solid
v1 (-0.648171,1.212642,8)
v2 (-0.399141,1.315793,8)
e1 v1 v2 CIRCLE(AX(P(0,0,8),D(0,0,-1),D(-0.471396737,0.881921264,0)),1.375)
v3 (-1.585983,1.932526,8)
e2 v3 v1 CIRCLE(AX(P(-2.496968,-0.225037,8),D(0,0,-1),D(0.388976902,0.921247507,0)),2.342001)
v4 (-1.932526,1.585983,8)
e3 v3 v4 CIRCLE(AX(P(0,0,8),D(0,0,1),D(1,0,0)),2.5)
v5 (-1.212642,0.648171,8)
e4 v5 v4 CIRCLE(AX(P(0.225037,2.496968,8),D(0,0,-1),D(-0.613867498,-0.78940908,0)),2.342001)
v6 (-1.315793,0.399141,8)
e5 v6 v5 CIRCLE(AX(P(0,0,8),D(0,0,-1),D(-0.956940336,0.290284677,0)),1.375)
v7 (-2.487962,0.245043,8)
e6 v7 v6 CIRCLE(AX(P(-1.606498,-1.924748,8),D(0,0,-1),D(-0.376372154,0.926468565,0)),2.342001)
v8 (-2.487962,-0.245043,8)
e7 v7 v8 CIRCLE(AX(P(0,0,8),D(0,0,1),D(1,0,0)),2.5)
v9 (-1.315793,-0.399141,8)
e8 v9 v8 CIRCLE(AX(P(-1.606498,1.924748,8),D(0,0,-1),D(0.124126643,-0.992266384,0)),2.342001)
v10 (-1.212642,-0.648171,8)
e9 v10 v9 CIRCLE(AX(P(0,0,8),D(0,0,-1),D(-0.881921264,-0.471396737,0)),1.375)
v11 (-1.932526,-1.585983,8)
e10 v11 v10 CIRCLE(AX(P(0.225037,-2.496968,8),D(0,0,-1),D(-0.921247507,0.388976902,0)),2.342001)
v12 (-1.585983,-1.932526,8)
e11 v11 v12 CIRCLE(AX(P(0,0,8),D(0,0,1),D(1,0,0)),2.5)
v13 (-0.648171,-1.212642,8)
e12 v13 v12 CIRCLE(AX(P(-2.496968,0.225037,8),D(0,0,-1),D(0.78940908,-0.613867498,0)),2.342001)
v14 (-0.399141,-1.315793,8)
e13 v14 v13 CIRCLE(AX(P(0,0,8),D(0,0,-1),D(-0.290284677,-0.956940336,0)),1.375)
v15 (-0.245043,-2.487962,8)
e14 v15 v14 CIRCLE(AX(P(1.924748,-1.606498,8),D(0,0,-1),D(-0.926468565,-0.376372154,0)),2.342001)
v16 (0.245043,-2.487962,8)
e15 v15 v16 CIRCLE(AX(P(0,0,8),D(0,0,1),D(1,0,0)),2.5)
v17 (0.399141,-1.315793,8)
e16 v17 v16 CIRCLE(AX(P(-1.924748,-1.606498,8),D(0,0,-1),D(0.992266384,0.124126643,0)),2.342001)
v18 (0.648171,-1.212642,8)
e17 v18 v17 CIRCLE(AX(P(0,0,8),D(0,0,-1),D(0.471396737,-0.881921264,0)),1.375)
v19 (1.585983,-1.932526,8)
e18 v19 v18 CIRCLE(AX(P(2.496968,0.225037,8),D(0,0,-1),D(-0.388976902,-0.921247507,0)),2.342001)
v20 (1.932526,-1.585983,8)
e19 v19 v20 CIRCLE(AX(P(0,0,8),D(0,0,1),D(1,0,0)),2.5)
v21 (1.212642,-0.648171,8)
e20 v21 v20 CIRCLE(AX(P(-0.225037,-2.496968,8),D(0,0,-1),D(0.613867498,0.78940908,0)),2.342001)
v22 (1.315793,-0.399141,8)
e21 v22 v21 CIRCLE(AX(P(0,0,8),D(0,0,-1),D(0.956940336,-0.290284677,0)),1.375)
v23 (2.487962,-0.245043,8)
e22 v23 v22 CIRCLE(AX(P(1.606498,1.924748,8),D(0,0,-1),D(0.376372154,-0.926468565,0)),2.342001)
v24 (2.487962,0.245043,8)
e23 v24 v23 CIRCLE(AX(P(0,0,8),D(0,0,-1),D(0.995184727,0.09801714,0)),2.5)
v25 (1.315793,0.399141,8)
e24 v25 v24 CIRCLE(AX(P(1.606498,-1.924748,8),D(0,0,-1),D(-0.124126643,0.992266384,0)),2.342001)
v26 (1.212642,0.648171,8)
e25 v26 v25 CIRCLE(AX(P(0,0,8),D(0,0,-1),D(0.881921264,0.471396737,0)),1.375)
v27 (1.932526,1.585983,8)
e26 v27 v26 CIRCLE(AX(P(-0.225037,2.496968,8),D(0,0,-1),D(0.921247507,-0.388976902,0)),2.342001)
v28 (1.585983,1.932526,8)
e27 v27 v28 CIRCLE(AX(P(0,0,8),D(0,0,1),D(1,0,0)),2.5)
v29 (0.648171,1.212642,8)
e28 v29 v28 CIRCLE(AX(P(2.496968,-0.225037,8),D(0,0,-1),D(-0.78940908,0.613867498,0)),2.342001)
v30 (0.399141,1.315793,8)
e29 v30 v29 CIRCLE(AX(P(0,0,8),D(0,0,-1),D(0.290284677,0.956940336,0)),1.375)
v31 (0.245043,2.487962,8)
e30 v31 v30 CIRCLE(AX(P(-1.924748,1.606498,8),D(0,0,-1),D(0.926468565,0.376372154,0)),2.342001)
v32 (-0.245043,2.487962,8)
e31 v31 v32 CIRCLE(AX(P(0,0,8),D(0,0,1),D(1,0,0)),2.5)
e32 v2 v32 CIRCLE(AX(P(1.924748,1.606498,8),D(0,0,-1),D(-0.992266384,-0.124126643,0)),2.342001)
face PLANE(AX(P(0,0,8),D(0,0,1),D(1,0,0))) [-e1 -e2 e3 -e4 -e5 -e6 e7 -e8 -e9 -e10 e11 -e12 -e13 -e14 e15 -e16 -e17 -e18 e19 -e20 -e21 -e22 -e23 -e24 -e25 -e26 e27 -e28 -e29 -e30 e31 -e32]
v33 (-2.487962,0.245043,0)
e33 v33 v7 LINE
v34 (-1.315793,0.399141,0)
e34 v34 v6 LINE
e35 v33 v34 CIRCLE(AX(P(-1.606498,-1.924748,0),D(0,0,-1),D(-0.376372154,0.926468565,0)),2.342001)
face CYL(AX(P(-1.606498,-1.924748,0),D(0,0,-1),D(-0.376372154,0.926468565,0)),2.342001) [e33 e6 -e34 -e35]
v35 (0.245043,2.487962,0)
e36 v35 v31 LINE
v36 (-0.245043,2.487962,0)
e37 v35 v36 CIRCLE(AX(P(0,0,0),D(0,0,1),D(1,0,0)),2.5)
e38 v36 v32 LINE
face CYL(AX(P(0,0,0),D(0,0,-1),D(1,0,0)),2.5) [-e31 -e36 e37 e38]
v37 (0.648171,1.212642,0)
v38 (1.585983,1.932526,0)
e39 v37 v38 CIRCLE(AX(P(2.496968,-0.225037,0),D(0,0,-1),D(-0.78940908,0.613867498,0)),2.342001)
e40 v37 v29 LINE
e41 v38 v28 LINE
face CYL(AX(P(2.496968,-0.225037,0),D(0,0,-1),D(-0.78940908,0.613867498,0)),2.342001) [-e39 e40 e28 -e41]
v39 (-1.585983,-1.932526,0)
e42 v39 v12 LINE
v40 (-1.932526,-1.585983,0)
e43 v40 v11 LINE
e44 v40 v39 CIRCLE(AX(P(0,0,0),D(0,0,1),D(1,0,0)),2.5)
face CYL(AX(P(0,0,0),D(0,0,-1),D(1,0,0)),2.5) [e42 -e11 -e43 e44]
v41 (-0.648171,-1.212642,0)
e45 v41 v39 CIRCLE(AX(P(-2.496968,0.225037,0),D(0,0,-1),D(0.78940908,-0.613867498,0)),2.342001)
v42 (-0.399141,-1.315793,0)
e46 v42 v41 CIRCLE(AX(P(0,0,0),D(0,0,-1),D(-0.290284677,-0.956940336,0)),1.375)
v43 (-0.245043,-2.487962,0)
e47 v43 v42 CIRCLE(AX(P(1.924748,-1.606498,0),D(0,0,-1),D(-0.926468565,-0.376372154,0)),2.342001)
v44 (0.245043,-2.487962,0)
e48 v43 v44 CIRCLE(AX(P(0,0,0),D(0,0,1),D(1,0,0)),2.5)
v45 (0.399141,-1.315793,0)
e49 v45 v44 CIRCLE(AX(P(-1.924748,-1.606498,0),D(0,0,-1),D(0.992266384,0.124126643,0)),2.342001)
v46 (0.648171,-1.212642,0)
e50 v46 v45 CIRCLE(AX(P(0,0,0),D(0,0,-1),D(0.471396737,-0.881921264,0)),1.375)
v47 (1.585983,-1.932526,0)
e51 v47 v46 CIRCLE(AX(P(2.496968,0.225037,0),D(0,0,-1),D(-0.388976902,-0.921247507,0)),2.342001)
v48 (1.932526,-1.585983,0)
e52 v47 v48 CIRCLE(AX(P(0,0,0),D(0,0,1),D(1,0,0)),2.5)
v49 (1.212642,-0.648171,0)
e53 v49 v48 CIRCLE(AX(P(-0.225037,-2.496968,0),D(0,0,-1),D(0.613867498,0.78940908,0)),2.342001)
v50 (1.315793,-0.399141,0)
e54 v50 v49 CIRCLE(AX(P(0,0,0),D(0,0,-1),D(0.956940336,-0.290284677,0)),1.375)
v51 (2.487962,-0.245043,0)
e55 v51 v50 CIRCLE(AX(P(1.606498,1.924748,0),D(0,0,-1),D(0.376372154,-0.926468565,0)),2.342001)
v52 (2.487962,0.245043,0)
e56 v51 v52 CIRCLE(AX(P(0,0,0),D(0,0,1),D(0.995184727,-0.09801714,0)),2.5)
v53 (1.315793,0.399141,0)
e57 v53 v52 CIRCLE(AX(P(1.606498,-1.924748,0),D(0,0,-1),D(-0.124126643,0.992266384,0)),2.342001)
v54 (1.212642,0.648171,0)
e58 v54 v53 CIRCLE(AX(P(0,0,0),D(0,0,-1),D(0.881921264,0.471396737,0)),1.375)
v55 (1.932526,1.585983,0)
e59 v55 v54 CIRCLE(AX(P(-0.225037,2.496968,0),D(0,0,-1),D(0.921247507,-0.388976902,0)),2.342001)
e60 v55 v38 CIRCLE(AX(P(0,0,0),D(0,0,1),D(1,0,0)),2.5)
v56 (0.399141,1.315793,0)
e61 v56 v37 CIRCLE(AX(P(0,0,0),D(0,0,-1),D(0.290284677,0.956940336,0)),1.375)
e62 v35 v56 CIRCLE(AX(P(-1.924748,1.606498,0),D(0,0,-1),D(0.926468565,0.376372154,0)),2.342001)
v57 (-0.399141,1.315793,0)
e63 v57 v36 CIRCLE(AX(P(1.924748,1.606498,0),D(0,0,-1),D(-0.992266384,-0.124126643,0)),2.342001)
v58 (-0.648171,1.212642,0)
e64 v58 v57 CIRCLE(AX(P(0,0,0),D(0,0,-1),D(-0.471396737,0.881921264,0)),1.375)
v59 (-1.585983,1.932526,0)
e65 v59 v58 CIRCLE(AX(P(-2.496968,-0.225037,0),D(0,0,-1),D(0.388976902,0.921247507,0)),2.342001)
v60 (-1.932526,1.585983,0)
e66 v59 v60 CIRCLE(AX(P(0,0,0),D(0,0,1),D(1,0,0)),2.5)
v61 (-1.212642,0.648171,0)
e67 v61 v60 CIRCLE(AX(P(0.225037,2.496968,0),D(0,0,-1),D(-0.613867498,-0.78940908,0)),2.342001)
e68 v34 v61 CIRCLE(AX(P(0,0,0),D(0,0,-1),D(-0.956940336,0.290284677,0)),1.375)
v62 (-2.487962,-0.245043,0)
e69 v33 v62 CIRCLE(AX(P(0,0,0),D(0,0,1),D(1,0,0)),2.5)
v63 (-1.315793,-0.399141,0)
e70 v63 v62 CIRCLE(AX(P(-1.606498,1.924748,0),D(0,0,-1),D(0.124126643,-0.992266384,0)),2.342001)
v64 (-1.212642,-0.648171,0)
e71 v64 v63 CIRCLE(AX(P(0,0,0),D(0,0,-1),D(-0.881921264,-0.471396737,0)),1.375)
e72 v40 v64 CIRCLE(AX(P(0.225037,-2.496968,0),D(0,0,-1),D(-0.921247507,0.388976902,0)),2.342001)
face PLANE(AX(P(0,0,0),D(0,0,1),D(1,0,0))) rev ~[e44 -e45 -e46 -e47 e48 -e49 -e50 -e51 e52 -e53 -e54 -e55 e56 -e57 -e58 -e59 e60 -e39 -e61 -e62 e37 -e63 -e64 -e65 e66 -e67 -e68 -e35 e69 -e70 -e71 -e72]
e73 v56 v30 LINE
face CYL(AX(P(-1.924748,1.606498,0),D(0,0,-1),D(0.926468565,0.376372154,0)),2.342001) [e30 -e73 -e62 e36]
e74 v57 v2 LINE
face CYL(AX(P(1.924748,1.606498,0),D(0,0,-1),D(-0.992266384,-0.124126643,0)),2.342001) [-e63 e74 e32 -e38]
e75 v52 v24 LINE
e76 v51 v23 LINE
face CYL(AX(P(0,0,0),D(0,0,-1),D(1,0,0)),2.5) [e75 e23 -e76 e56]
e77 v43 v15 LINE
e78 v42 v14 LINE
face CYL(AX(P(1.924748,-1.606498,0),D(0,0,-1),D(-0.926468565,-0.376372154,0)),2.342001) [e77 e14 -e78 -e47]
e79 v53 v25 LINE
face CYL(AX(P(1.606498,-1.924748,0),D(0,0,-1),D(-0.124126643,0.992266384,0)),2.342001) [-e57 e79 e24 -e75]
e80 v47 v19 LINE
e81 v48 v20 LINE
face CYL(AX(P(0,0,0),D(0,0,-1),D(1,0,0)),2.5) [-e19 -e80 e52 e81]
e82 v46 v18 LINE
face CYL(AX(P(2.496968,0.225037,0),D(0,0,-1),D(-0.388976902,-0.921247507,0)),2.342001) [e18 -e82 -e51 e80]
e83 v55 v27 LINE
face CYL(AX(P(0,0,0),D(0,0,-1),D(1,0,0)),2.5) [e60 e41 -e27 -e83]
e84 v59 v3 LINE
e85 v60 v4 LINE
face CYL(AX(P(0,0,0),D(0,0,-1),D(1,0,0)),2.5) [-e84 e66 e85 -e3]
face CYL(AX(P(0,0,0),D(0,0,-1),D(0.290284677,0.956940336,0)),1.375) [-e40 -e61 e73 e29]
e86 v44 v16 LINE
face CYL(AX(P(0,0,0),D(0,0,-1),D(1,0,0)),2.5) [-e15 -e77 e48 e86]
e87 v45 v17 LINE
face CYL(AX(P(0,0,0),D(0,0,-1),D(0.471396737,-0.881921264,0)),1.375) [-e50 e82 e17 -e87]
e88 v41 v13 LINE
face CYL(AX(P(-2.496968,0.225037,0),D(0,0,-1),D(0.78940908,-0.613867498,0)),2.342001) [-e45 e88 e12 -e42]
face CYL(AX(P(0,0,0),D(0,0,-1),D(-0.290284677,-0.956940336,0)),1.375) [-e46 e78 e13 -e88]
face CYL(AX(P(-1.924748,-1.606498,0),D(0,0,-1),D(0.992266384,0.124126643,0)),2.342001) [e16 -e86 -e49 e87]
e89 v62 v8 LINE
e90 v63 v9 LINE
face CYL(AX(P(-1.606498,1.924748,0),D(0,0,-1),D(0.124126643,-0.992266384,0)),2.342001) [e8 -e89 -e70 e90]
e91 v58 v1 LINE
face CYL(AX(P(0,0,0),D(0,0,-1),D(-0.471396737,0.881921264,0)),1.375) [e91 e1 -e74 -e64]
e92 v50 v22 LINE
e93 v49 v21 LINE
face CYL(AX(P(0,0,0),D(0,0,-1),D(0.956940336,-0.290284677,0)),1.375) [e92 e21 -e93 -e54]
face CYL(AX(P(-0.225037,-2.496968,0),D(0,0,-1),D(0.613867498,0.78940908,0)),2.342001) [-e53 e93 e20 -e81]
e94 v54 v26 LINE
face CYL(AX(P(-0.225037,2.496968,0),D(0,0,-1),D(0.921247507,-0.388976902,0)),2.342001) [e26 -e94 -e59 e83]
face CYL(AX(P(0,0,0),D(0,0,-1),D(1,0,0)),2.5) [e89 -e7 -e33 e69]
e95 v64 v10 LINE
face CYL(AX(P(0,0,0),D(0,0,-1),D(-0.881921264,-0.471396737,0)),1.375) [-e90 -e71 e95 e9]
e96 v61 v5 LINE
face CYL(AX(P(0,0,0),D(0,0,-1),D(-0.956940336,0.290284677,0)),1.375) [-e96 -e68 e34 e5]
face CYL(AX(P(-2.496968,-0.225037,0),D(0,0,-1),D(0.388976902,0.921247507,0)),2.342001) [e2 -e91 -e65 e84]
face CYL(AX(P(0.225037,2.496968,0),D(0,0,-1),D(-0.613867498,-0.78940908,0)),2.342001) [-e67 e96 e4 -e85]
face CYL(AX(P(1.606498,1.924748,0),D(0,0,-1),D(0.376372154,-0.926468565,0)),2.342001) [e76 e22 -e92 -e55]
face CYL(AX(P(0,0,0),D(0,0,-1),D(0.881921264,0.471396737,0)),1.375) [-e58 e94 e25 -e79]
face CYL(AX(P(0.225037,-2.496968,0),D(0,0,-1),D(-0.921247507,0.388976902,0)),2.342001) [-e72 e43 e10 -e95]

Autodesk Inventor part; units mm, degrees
sketch "Sketch1" plane through (0, 0, 0) normal (0, 0, 1) x (1, 0, 0)
  circle A0 centre (0, 0) radius 2.5
  dimension "d0" = 5
extrude "Extrusion1" add sketch "Sketch1" along normal blind 8
ref_plane "Work Plane2" through (0, 0, 4) normal (0, 0, 1) x (1, 0, 0)
sketch "Sketch2" plane through (0, 0, 0) normal (0, 0, -1) x (-1, 0, 0)
  circle A0 centre (0, 0) radius 2.5 projected
  circle A1 centre (0, 0) radius 2
  dimension "d3" = 4
surface extrude "ピッチ円直径" sketch "Sketch2" against normal through all shown no curves A1
ref_plane "Work Plane8" through (0, 0, 0) normal (0.9238795, 0.3826834, 0) x (0, 0, 1)
ref_plane "Work Plane9" through (0, 0, 0) normal (1, 0, 0) x (0, 1, 0)
spur gear teeth "平歯車" teeth 8 pitch diameter 4 tip diameter 5 root diameter 2.75 face width 8 start plane through (0, 0, 0) normal (0, 0, -1) x (-1, 0, 0)
equation "\"d0\" = da_da"
equation "\"d1\" = da_b"
equation "\"d3\" = da_d"
equation "\"d16\" = da_aw"
equation "\"d43\" = da_aw"
equation "\"d46\" = da_aw"
equation "\"da_da\" = 5"
equation "\"da_b\" = 8"
equation "\"da_d\" = 4"
equation "\"da_aw\" = 11"
properties part number "gear8t" material "Steel"
